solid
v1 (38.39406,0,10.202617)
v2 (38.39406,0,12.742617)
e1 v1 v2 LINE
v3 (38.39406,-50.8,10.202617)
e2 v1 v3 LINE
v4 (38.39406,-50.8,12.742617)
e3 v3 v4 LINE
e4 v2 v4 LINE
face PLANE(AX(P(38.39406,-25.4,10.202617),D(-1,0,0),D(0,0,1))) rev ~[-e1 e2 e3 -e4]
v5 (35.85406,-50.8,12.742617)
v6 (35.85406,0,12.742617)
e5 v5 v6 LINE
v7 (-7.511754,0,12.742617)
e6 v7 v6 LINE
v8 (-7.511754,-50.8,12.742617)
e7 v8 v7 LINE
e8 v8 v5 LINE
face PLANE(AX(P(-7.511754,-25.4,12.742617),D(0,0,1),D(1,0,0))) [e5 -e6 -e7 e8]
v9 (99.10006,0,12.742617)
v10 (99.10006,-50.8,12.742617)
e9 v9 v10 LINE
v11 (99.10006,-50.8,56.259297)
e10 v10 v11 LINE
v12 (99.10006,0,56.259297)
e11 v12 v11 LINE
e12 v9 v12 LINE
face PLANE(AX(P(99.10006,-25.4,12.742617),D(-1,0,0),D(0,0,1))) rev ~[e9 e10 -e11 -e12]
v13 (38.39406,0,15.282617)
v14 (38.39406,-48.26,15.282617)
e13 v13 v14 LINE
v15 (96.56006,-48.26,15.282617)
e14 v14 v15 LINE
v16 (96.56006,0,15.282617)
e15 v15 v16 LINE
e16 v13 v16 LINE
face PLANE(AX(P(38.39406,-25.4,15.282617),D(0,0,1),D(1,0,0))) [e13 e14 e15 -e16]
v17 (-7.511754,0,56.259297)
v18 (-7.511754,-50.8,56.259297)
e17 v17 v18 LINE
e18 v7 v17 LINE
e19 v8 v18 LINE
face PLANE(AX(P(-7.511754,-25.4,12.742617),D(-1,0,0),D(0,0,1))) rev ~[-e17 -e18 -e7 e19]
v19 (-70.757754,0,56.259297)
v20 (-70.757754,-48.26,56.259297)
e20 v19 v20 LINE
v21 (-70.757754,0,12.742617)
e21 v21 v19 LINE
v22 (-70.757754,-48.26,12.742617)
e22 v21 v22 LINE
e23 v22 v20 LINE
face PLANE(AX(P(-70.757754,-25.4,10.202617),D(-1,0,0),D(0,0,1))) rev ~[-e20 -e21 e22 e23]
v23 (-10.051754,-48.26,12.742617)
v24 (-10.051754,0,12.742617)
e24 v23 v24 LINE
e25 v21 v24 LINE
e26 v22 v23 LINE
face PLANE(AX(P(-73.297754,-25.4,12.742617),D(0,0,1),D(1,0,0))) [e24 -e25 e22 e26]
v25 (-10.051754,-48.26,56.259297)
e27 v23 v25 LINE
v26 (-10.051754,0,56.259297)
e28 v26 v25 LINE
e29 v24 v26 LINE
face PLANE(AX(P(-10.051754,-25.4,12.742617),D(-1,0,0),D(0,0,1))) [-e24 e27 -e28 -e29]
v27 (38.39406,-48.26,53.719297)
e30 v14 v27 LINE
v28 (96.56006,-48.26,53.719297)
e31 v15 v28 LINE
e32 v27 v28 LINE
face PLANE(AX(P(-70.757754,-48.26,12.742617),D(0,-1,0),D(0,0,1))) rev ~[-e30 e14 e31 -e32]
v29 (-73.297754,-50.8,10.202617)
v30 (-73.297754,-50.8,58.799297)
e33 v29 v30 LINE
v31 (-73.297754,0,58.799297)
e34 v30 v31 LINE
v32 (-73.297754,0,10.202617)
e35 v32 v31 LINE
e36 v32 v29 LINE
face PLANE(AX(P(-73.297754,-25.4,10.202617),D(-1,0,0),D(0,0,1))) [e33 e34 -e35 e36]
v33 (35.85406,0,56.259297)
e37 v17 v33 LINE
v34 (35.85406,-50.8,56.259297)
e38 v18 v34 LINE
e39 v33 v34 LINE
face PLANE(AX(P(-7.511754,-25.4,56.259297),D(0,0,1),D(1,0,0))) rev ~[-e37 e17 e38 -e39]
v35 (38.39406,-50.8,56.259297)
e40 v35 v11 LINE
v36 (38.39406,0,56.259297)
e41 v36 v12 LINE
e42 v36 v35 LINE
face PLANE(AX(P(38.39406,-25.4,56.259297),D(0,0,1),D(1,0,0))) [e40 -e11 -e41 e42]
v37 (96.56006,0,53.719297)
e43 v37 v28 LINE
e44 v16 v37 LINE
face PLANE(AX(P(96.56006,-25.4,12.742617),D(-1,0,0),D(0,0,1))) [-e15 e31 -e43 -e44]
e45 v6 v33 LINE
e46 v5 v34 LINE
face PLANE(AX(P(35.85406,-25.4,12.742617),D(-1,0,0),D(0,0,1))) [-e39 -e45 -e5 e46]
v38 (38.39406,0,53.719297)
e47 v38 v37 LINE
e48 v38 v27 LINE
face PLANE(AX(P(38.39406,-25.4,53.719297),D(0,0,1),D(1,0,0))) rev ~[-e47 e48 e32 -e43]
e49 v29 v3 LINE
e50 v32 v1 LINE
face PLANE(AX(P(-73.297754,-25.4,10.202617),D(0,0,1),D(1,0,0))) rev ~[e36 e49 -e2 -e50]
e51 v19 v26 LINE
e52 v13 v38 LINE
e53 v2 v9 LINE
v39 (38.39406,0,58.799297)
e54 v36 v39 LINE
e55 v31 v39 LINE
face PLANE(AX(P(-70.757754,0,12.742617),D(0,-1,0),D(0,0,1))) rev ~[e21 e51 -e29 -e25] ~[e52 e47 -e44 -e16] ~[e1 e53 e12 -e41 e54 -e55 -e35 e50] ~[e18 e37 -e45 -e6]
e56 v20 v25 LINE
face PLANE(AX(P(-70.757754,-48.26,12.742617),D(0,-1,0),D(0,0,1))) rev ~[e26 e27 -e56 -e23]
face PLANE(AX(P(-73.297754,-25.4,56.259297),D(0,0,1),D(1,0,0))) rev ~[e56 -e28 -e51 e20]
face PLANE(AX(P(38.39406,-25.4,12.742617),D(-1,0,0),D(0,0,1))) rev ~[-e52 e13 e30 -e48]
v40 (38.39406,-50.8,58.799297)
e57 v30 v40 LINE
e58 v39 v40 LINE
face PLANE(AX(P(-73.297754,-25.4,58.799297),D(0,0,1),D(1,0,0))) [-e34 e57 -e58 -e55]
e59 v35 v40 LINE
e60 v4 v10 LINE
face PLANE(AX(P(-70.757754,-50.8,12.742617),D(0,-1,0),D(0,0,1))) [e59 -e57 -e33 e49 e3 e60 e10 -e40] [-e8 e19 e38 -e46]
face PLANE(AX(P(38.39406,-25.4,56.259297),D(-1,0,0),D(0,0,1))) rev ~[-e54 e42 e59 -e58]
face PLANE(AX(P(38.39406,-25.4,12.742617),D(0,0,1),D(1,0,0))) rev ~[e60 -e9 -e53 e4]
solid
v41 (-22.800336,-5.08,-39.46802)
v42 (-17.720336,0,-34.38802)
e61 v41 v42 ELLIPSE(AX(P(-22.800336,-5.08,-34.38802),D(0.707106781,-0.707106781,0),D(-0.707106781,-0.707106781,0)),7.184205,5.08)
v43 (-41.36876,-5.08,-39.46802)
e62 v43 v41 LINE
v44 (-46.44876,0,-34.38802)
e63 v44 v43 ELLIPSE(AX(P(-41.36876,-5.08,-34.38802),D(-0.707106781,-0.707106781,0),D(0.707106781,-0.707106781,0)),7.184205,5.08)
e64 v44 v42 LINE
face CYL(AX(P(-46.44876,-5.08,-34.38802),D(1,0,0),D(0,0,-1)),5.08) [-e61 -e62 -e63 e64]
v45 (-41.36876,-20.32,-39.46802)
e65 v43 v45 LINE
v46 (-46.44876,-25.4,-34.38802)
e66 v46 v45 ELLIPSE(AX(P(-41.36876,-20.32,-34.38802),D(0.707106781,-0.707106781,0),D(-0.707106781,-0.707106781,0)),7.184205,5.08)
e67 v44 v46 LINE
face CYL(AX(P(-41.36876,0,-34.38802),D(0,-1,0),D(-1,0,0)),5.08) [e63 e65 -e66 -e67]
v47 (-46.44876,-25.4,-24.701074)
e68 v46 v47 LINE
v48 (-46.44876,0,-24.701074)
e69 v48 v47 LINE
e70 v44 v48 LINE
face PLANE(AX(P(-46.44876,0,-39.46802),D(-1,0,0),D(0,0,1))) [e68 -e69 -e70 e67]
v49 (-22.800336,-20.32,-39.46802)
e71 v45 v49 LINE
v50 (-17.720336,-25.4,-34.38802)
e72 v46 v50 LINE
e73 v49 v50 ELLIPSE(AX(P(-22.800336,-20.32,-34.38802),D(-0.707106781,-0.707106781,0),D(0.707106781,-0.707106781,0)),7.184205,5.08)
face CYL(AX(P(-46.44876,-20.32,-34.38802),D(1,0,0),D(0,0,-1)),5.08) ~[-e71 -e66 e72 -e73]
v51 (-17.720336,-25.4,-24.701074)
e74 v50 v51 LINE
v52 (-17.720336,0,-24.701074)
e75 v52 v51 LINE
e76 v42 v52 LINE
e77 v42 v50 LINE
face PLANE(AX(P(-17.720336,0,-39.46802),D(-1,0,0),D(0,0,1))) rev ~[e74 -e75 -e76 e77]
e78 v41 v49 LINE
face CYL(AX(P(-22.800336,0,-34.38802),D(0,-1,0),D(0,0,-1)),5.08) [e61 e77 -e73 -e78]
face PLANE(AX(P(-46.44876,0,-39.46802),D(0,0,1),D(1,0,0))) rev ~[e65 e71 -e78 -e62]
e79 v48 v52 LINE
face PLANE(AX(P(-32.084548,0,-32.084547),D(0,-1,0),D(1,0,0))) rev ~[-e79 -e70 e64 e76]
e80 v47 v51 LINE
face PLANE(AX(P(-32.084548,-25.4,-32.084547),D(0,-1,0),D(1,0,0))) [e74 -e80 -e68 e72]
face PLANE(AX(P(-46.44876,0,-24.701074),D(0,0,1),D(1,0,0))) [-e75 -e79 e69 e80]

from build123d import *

# Parameters (mm, degrees)
F0_W        = 111.691813916
F0_H        = 48.596679233
F1_DEPTH    = 25.4
F0_W_2      = 28.7284236401
F0_H_2      = 14.766946435
F2_T        = -2.54
F3_DEPTH    = 63.246
F4_DEPTH    = 25.4
F5_T        = 2.54
F5_T3_DEPTH = 55.88
F6_R        = 5.08


# Not quite as in the source:
# - a shell that OpenCascade refuses in one call is made with other operations: the cavity is built on its own and cut out


with BuildPart() as f1:
    # F0 (on Front) → F1 (new body)
    with BuildSketch(Plane.XZ):
        with Locations((-17.4518469721, 34.500957001)):
            Rectangle(F0_W, F0_H)
    extrude(amount=F1_DEPTH)

    # F2
    f2_openings = [f1.faces().sort_by_distance(p)[0] for p in [
        (-17.451847, -25.4, 34.500957),
        (-17.451847, 0, 34.500957),
    ]]
    offset(amount=F2_T, openings=f2_openings)

    # F3 (add): faces of the model
    f3_faces = [f1.faces().sort_by_distance(p)[0] for p in [
        (-70.7577539301, -12.7, 34.500957001),
        (35.8540599859, -12.7, 34.500957001),
    ]]
    extrude(f3_faces, amount=F3_DEPTH, dir=(1, 0, 0))

    # F4 (add): a face of the model
    f4_faces = [f1.faces().sort_by_distance(p)[0] for p in [
        (36.602897138, -25.4, 57.5292966175),
    ]]
    extrude(f4_faces, amount=F4_DEPTH)

    # F5: shell of thickness 2.54, made by hand


with BuildPart() as f1b:
    # F0 (on Front) → F1, piece 2 (new body)
    with BuildSketch(Plane.XZ):
        with Locations((-32.0845479146, -32.0845469832)):
            Rectangle(F0_W_2, F0_H_2)
    extrude(amount=F1_DEPTH)

    # F6
    f6_edges = [f1b.edges().sort_by_distance(p)[0] for p in [
        (-46.44876, -12.7, -39.46802),
        (-17.720336, -12.7, -39.46802),
        (-32.084548, 0, -39.46802),
        (-32.084548, -25.4, -39.46802),
    ]]
    fillet(f6_edges, radius=F6_R)


with BuildPart() as f5_core1:
    # F5_t2: copy of F1
    add(f1.part)

    # the walls: a layer under each face that stays
    f5_faces = [f5_core1.faces().sort_by_distance(p)[0] for p in [
        (-17.4518469721, -25.4, 58.7992966175),
        (-7.5117539301, -25.4, 34.500957001),
        (14.1711530279, -25.4, 12.7426173845),
        (35.8540599859, -25.4, 34.500957001),
        (14.1711530279, -25.4, 56.2592966175),
        (68.7470599859, -25.4, 56.2592966175),
        (99.1000599859, -25.4, 34.500957001),
        (68.7470599859, -25.4, 12.7426173845),
        (38.3940599859, -25.4, 11.4726173845),
        (-17.4518469721, -25.4, 10.2026173845),
        (-73.2977539301, -25.4, 34.500957001),
        (-44.5647849441, -50.8, 18.3020639233),
        (38.3940599859, -25.4, 57.5292966175),
    ]]
    thicken(f5_faces, amount=-F5_T, mode=Mode.SUBTRACT)

    # F5_s4 → F5_t3 (cut)
    with BuildSketch(Plane.XZ.offset(-2.54)):
        Polygon((-7.4863539301, 56.2338966175), (-10.0517539301, 56.2592966175), (-10.0517539301, 58.7992966175), (-7.5117539301, 58.7992966175), align=None)
        Polygon((-7.4863539301, 12.7680173845), (-10.0517539301, 12.7426173845), (-10.0517539301, 10.2026173845), (-7.5117539301, 10.2026173845), align=None)
        Polygon((35.8286599859, 12.7680173845), (35.8540599859, 10.2026173845), (38.3940599859, 10.2026173845), (38.3940599859, 12.7426173845), align=None)
        Polygon((35.8286599859, 56.2338966175), (38.3940599859, 56.2592966175), (38.3940599859, 58.7992966175), (35.8540599859, 58.7992966175), align=None)
        Polygon((38.4194599859, 56.2846966175), (38.3940599859, 53.7192966175), (35.8540599859, 53.7192966175), (35.8540599859, 56.2592966175), align=None)
        Polygon((38.4194599859, 12.7172173845), (38.3940599859, 15.2826173845), (35.8540599859, 15.2826173845), (35.8540599859, 12.7426173845), align=None)
    extrude(amount=F5_T3_DEPTH, mode=Mode.SUBTRACT)


with BuildPart() as f1_1:
    add(f1.part)

    # what is left inside the walls is the cavity
    f5_cavity = [f5_core1.part.solids().sort_by_distance(p)[0] for p in [
        (77.171393, -24.13, 53.693897),
        (-40.404754, -32.173333, 56.233897),
    ]]
    add(f5_cavity, mode=Mode.SUBTRACT)


solid = Compound([f1b.part, f1_1.part])
